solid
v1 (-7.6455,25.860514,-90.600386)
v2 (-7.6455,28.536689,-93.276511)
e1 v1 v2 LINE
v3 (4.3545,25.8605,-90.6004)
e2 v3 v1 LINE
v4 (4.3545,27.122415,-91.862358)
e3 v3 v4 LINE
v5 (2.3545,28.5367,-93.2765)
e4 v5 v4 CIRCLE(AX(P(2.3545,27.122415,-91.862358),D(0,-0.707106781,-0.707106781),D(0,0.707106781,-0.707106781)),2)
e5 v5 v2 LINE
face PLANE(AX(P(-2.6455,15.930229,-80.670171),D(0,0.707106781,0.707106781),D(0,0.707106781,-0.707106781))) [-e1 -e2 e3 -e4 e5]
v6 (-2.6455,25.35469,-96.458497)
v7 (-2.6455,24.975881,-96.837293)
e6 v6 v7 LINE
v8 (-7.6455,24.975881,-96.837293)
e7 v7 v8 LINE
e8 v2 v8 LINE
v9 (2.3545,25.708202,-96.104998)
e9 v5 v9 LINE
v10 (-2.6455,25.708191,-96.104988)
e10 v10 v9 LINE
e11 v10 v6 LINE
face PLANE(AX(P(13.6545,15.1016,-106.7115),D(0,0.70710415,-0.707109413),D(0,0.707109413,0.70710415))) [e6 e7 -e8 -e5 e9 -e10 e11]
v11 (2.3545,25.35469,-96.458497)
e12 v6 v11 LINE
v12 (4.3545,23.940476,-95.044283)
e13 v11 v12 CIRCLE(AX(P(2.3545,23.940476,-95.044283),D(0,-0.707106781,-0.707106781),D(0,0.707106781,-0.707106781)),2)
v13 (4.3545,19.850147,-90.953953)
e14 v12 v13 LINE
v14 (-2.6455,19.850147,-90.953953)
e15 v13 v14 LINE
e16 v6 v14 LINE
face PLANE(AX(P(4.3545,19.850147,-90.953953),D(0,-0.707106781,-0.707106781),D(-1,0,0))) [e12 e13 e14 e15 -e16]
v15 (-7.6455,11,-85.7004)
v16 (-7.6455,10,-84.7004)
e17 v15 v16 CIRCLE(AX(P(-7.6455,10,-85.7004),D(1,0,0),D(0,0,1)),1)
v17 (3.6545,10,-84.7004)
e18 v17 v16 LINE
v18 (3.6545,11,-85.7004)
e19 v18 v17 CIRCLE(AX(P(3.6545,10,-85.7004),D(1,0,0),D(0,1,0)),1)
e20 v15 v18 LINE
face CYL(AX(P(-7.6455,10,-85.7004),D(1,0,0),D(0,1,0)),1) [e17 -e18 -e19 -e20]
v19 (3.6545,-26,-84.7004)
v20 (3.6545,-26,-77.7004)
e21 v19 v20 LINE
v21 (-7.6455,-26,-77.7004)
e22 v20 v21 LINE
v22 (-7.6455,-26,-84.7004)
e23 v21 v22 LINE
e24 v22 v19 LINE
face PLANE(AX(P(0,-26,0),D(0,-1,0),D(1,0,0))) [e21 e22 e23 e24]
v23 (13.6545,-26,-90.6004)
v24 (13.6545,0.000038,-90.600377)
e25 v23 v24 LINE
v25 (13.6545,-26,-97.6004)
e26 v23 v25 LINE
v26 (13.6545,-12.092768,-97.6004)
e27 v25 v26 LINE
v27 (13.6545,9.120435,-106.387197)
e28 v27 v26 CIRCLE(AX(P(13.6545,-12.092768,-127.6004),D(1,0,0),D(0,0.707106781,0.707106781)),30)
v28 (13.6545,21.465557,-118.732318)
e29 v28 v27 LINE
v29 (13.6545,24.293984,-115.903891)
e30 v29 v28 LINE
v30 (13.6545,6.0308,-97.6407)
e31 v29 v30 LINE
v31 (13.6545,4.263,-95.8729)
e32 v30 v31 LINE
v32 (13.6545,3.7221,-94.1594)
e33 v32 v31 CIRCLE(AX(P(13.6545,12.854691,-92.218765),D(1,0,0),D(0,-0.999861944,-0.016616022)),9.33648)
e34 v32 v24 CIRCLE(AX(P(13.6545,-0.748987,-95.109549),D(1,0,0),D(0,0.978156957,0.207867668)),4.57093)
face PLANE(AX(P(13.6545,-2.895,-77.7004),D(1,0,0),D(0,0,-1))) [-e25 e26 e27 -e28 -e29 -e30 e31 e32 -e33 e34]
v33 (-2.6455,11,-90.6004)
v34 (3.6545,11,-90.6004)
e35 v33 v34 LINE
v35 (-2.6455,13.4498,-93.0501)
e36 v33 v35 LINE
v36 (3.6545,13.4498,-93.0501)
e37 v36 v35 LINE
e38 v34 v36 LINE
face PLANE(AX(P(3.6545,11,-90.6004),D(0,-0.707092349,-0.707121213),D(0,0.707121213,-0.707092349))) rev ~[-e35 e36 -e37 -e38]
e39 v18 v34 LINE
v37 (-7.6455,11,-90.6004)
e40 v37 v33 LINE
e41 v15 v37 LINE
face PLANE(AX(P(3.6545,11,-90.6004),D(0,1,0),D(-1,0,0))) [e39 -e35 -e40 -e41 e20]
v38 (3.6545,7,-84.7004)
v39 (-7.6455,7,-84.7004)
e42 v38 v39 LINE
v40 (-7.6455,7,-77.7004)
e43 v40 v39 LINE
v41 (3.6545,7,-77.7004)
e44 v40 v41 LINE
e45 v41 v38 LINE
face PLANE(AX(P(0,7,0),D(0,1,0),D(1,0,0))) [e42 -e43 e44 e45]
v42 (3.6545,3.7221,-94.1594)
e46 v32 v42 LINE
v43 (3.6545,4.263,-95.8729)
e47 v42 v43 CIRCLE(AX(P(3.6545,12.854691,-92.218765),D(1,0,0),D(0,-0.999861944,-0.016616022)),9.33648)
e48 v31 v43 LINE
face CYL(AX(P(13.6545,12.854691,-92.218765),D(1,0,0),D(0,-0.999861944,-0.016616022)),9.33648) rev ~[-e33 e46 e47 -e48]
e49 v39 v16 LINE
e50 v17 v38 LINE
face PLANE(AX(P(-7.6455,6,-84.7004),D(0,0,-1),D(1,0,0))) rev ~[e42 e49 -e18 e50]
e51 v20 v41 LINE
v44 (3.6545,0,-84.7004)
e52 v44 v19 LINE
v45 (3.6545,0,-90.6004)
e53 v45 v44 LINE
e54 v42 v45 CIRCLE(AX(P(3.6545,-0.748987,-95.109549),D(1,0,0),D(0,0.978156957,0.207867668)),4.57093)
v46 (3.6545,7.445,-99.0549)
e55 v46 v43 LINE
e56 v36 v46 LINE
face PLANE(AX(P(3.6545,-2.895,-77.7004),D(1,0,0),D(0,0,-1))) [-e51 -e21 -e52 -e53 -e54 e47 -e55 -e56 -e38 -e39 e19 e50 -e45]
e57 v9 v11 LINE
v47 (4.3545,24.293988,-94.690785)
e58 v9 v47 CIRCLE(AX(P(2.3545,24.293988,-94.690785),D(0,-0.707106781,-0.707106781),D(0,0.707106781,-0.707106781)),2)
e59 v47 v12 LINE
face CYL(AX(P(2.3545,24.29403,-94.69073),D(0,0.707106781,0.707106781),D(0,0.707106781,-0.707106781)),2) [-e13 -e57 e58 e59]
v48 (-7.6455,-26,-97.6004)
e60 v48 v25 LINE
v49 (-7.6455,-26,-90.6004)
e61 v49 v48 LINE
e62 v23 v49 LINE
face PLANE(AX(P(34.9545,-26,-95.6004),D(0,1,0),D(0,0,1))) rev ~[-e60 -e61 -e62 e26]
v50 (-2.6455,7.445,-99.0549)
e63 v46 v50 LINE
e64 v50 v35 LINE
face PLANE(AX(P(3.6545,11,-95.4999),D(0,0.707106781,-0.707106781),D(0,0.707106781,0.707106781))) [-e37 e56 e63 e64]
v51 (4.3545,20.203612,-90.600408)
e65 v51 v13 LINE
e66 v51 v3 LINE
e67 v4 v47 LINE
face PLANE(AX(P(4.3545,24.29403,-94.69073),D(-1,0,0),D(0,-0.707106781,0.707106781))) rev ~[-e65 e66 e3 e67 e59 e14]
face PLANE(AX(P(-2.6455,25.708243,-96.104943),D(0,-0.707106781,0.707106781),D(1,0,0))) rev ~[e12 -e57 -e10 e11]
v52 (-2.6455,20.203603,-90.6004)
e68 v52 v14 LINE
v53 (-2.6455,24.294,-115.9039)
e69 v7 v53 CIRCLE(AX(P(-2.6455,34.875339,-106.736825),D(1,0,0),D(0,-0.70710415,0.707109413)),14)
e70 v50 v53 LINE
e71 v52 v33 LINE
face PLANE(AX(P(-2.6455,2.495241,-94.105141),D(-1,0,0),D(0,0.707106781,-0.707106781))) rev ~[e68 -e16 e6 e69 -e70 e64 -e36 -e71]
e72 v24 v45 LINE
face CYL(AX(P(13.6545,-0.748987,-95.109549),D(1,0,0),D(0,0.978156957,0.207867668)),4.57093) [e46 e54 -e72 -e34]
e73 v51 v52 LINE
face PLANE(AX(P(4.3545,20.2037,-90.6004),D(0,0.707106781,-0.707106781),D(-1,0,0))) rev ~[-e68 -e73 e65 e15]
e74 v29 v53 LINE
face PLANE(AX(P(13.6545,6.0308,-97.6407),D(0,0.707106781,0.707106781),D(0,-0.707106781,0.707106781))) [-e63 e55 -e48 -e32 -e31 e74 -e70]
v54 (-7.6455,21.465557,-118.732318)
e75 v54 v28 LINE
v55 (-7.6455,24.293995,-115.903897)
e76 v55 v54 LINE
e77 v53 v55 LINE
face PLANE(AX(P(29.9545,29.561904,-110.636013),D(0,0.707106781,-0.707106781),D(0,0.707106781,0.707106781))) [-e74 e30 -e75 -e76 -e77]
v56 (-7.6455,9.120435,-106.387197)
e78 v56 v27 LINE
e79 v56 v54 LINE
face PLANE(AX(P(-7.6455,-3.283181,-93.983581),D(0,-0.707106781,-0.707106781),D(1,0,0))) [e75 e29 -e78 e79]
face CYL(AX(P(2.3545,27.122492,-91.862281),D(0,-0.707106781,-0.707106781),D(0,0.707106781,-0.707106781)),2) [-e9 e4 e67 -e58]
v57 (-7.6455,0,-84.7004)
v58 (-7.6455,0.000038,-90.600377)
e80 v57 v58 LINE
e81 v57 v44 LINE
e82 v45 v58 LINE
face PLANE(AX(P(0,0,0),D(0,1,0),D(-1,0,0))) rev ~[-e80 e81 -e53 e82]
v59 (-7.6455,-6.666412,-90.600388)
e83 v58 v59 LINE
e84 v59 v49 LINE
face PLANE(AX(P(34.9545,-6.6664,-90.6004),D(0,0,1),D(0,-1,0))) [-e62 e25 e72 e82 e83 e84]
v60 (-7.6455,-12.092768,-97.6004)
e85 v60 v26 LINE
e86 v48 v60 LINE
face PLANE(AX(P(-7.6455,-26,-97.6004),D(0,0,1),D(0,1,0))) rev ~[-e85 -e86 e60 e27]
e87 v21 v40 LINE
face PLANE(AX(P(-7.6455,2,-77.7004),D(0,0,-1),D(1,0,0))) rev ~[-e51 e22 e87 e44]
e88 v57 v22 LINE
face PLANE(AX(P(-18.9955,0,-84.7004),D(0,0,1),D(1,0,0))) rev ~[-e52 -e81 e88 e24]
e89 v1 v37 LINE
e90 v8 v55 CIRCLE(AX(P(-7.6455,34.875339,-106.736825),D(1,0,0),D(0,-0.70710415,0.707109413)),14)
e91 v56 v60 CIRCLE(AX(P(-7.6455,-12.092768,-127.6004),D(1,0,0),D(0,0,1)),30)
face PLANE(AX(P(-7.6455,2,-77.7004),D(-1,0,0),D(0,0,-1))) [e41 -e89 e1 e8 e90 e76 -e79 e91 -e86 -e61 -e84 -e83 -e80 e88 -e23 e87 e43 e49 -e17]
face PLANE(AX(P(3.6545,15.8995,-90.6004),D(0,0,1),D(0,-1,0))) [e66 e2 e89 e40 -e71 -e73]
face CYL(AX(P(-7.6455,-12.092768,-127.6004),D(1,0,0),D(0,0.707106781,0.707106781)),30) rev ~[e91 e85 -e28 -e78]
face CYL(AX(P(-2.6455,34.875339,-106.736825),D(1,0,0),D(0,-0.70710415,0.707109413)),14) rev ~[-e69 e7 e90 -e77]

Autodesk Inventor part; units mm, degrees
ref_plane "YZ Plane" through (0, 0, 0) normal (1, 0, 0) x (0, 1, 0)
ref_plane "XZ Plane" through (0, 0, 0) normal (0, 1, 0) x (-1, 0, 0)
ref_plane "XY Plane" through (0, 0, 0) normal (0, 0, 1) x (1, 0, 0)
sketch "Sketch1" plane through (0, 0, 0) normal (0, 1, 0) x (-1, 0, 0)
  line L0 (23.4955, 9.8996) -> (-50.8045, 9.8996)
  line L1 (-50.8045, 9.8996) -> (-50.8045, -84.7004)
  line L2 (-50.8045, -84.7004) -> (23.4955, -84.7004)
  line L3 (23.4955, -84.7004) -> (23.4955, 9.8996)
  line L4 (29.4455, 15.7996) -> (-56.7545, 15.7996)
  line L5 (-56.7545, 15.7996) -> (-56.7545, -90.6004)
  line L6 (-56.7545, -90.6004) -> (29.4455, -90.6004)
  line L7 (29.4455, -90.6004) -> (29.4455, 15.7996)
  line L8 (29.4455, -37.4004) -> (-56.7545, -37.4004) construction
  line L9 (-13.6545, -90.6004) -> (-13.6545, 15.7996) construction
  dimension "d0" = 94.6
  dimension "d1" = 74.3
  dimension "d2" = 106.4
  dimension "d3" = 86.2
extrude "Extrusion1" add sketch "Sketch1" along normal blind 6
fillet "Fillet1" radius 4.5 4 edges at (-23.4955, 3, 9.8996) (50.8045, 3, 9.8996) (50.8045, 3, -84.7004) (-23.4955, 3, -84.7004)
fillet "Fillet2" radius 4.5 4 edges at (56.7545, 3, 15.7996) (-29.4455, 3, 15.7996) (56.7545, 3, -90.6004) (-29.4455, 3, -90.6004)
sketch "Sketch2" plane through (0, 0, 0) normal (0, -1, 0) x (1, 0, 0)
  line L0 (50.8045, -80.2004) -> (50.8045, 5.3996) projected
  arc A0 (46.3045, -84.7004) -> (50.8045, -80.2004) centre (46.3045, -80.2004) ccw projected
  line L1 (-18.9955, -84.7004) -> (46.3045, -84.7004) projected
  arc A1 (-23.4955, -80.2004) -> (-18.9955, -84.7004) centre (-18.9955, -80.2004) ccw projected
  line L2 (-23.4955, 5.3996) -> (-23.4955, -80.2004) projected
  arc A2 (-18.9955, 9.8996) -> (-23.4955, 5.3996) centre (-18.9955, 5.3996) ccw projected
  line L3 (46.3045, 9.8996) -> (-18.9955, 9.8996) projected
  arc A3 (50.8045, 5.3996) -> (46.3045, 9.8996) centre (46.3045, 5.3996) ccw projected
  line L4 (43.8045, -77.7004) -> (-16.4955, -77.7004)
  line L5 (-16.4955, -77.7004) -> (-16.4955, 2.8996)
  line L6 (-16.4955, 2.8996) -> (43.8045, 2.8996)
  line L7 (43.8045, 2.8996) -> (43.8045, -77.7004)
  line L8 (13.6545, -84.7004) -> (13.6545, 9.8996) construction
  line L9 (46.3045, 9.8996) -> (-18.9955, 9.8996) construction
  line L10 (50.8045, -80.2004) -> (50.8045, 5.3996) construction
  line L11 (50.8045, -37.4004) -> (-23.4955, -37.4004) construction
  line L12 (56.7545, 11.2996) -> (56.7545, -86.1004) construction
  point P0 (0, 0)
  dimension "d8" = 5.95
  dimension "d9" = 7
  dimension "d10" = 7
extrude "Extrusion2" add sketch "Sketch2" along normal blind 6
fillet "Fillet3" radius 4.5 4 edges at (43.8045, -3, -77.7004) (43.8045, -3, 2.8996) (-16.4955, -3, 2.8996) (-16.4955, -3, -77.7004)
sketch "Sketch3" plane through (0, 0, 0) normal (0, 1, 0) x (1, 0, 0)
  arc A0 (46.3045, -9.8996) -> (50.8045, -5.3996) centre (46.3045, -5.3996) ccw projected
  line L0 (50.8045, 80.2004) -> (50.8045, -5.3996) projected
  arc A1 (50.8045, 80.2004) -> (46.3045, 84.7004) centre (46.3045, 80.2004) ccw projected
  line L1 (-18.9955, 84.7004) -> (46.3045, 84.7004) projected
  arc A2 (-18.9955, 84.7004) -> (-23.4955, 80.2004) centre (-18.9955, 80.2004) ccw projected
  line L2 (-23.4955, -5.3996) -> (-23.4955, 80.2004) projected
  arc A3 (-23.4955, -5.3996) -> (-18.9955, -9.8996) centre (-18.9955, -5.3996) ccw projected
  line L3 (46.3045, -9.8996) -> (-18.9955, -9.8996) projected
  arc A4 (43.8045, 73.2004) -> (39.3045, 77.7004) centre (39.3045, 73.2004) ccw projected
  line L4 (43.8045, 1.6004) -> (43.8045, 73.2004) projected
  arc A5 (39.3045, -2.8996) -> (43.8045, 1.6004) centre (39.3045, 1.6004) ccw projected
  line L5 (-11.9955, -2.8996) -> (39.3045, -2.8996) projected
  arc A6 (-16.4955, 1.6004) -> (-11.9955, -2.8996) centre (-11.9955, 1.6004) ccw projected
  line L6 (-16.4955, 73.2004) -> (-16.4955, 1.6004) projected
  arc A7 (-11.9955, 77.7004) -> (-16.4955, 73.2004) centre (-11.9955, 73.2004) ccw projected
  line L7 (39.3045, 77.7004) -> (-11.9955, 77.7004) projected
  point P0 (0, 0)
extrude "Extrusion3" add sketch "Sketch3" along normal blind 2
ref_plane "Work Plane1" through (-23.4955, 6, -84.7004) normal (0, 0.7071068, -0.7071068) x (1, 0, 0)
sketch "Sketch5" plane through (-23.4955, 6, -84.7004) normal (0, 0.7071068, -0.7071068) x (1, 0, 0)
  line L0 (4.5, 0) -> (69.8, 0) projected
  line L1 (37.15, 0) -> (37.15, -42.3796) construction
  circle A0 centre (37.15, 1.34) radius 1.34 construction
  line L2 (37.15, 1.34) -> (37.15, -18.66) construction
  line L3 (38.49, 1.34) -> (38.49, -18.66)
  line L4 (35.81, -18.66) -> (35.81, 1.34)
  arc A1 (38.49, 1.34) -> (35.81, 1.34) centre (37.15, 1.34) ccw
  arc A2 (35.81, -18.66) -> (38.49, -18.66) centre (37.15, -18.66) ccw
  point P0 (23.4955, -55.6496)
  point P1 (37.15, -8.66)
  dimension "d20" = 2.68
  dimension "d19" = 90
  dimension "d21" = 20
  dimension "d22" = 2.68
extrude "Extrusion5" cut sketch "Sketch5" along normal mid plane 51.82
sketch "Sketch6" plane through (-23.4955, 6, -84.7004) normal (0, 0.7071068, -0.7071068) x (1, 0, 0)
  arc A0 (38.49, 1.34) -> (35.81, 1.34) centre (37.15, 1.34) ccw projected
  line L0 (38.49, 0) -> (38.49, 1.34) projected
  arc A1 (38.49, 1.34) -> (35.81, 1.34) centre (37.15, 1.34) ccw projected
  line L1 (35.81, 1.34) -> (35.81, 0) projected
  line L2 (4.5, 0) -> (35.81, 0) projected
  line L3 (4.5, 2.8284) -> (4.5, 0) projected
  line L4 (4.5, 2.8284) -> (69.8, 2.8284) projected
  line L5 (69.8, 0) -> (69.8, 2.8284) projected
  line L6 (38.49, 0) -> (69.8, 0) projected
  line L7 (75.75, 8.4146) -> (-1.45, 8.4146) projected
  line L8 (74.9473, 2.68) -> (-18.0058, 2.68) construction
  line L9 (0, -55.225) -> (0, 5.3033) construction
  line L10 (90.8097, 9.1284) -> (-67.1811, 9.1284) construction
  line L11 (37.15, 2.68) -> (37.15, 37.6448) construction
  line L12 (58.45, 9.1284) -> (15.85, 9.1284)
  line L13 (15.85, 9.1284) -> (15.85, 13.1284)
  line L14 (15.85, 13.1284) -> (58.45, 13.1284)
  line L15 (58.45, 13.1284) -> (58.45, 9.1284)
  point P0 (23.4955, -55.6496)
  dimension "d25" = 6.3
  dimension "d26" = 42.6
  dimension "d27" = 4
extrude "Extrusion6" add sketch "Sketch6" along normal blind 35 contours L12 L13 L14 L15
sketch "Sketch7" plane through (-23.4955, 30.7487, -109.4492) normal (0, 0.7071068, -0.7071068) x (-1, 0, 0)
  line L0 (-15.85, -13.1284) -> (-15.85, -9.1284) projected
  line L1 (-58.45, -9.1284) -> (-58.45, -13.1284) projected
  point P0 (-23.4955, 55.6496)
  point P1 (-15.85, -11.1284)
  point P2 (-58.45, -11.1284)
  dimension "d30" = 42.6
sketch "Sketch8" plane through (34.9545, -3.2832, -93.9836) normal (1, 0, 0) x (0, 0.7071068, -0.7071068)
  line L0 (-0.0707, 4.7139) -> (-3.2527, 7.8958) projected
  line L1 (0.9899, 12.1385) -> (4.1719, 8.9565) projected
  line L2 (0, 0) -> (35, 0) projected
  line L3 (-0.0707, 4.7139) -> (-14.2134, -9.4288) construction
  line L4 (0, 4) -> (35, 4) projected
  line L5 (0, 4) -> (0, 0) projected
  line L6 (4.1719, 8.9565) -> (-4.7846, 0)
  line L7 (-4.7846, 0) -> (0, 0)
  line L8 (0, 0) -> (0, 4) projected
  line L9 (0, 0) -> (0, 4)
  line L10 (4.1719, 8.9565) -> (4.1719, 4)
  line L11 (0, 4) -> (35, 4) projected
  line L12 (4.1719, 4) -> (0, 4)
  line L13 (-0.0707, 4.7139) -> (4.1719, 8.9565) projected
  point P0 (-64.1349, 68.778)
  point P1 (4.1719, 4)
extrude "Extrusion7" add sketch "Sketch8" against normal blind 42.6
sketch "Sketch9" plane through (34.9545, -6.6664, -90.6004) normal (1, 0, 0) x (0, 0, -1)
  line L0 (0, 6.6664) -> (0, 0) projected
  line L1 (0, 0) -> (28.1319, 28.1319) projected
  line L2 (0, 0) -> (0, 6.6664) projected
  line L3 (0, 0) -> (0, -20)
  line L4 (0, -20) -> (5, -20)
  line L5 (5, -20) -> (5, 5)
  line L6 (0, 0) -> (28.1319, 28.1319) projected
  line L7 (5, 5) -> (0, 0)
  point P0 (-90.6004, 6.6664)
  point P1 (5, 5)
  dimension "d33" = 5
  dimension "d34" = 20
extrude "Extrusion8" add sketch "Sketch9" against normal blind 42.6
sketch "Sketch10" plane through (-7.6455, 24.294, -115.9039) normal (0, 0.7071068, 0.7071068) x (1, 0, 0)
  line L0 (0, -30.8281) -> (42.6, -30.8281) projected
  line L1 (42.6, -30.8281) -> (42.6, 0) projected
  line L2 (0, 0) -> (42.6, 0) projected
  line L3 (0, -30.8281) -> (0, 0) projected
  line L4 (42.6, -30.8281) -> (0, -30.8281) projected
  line L5 (0, -30.8281) -> (5, -30.8281)
  line L6 (5, -30.8281) -> (5, 0)
  line L7 (5, 0) -> (0, 0)
  line L8 (0, 0) -> (0, -30.8281)
  line L9 (42.6, 0) -> (0, 0) projected
  line L10 (37.6, 0) -> (42.6, 0)
  line L11 (42.6, 0) -> (42.6, -30.8281)
  line L12 (42.6, -30.8281) -> (37.6, -30.8281)
  line L13 (37.6, -30.8281) -> (37.6, 0)
  point P0 (7.6455, -99.1349)
  point P1 (37.6, 0)
  point P2 (37.6, -30.8281)
  dimension "d37" = 5
  dimension "d38" = 5
extrude "Extrusion9" add sketch "Sketch10" along normal blind 19 contours L3 L2 L6 L0 | L13 L2 L1 L0
sketch "Sketch11" plane through (-7.6455, 37.729, -102.4689) normal (0, 0.7071068, 0.7071068) x (1, 0, 0)
  line L0 (0, -30.8281) -> (5, -30.8281) projected
  line L1 (5, 0) -> (0, 0) projected
  point P0 (7.6455, -99.1349)
  point P1 (2.5, 0)
  point P2 (2.5, -30.8281)
  dimension "d41" = 30.8281
sketch "Sketch12" plane through (-2.6455, 2.4952, -94.1052) normal (1, 0, 0) x (0, -0.7071068, -0.7071068)
  line L0 (0, 30.8281) -> (0, 0) projected
  line L1 (0, 30.8281) -> (-19, 30.8281) projected
  line L2 (-19, 0) -> (-19, 30.8281) projected
  line L3 (-4.9565, 0) -> (-19, 0) projected
  line L4 (0, 0) -> (-4.9565, 0) projected
  line L5 (-19, 30.8281) -> (-15, 30.8281)
  line L6 (-15, 30.8281) -> (-15, 0)
  line L7 (-15, 0) -> (-19, 0)
  line L8 (-19, 0) -> (-19, 30.8281)
  point P0 (-64.778, -68.3068)
  dimension "d42" = 15
extrude "Extrusion10" add sketch "Sketch12" along normal blind 8.5 contours L6 L3 L2 L1
sketch "Sketch13" plane through (29.9545, 2.4952, -94.1052) normal (-1, 0, 0) x (0, 0.7071068, 0.7071068)
  line L0 (0, 0) -> (0, 30.8281) projected
  line L1 (4.9565, 0) -> (0, 0) projected
  line L2 (4.9565, 0) -> (19, 0) projected
  line L3 (19, 30.8281) -> (19, 0) projected
  line L4 (0, 30.8281) -> (19, 30.8281) projected
  line L5 (19, 30.8281) -> (7.45, 30.8281)
  line L6 (7.45, 30.8281) -> (7.45, 0)
  line L7 (7.45, 0) -> (19, 0)
  line L8 (19, 0) -> (19, 30.8281)
  point P0 (64.778, -68.3068)
  point P1 (7.45, 30.8281)
  dimension "d45" = 7.45
extrude "Extrusion11" add sketch "Sketch13" along normal blind 8.5 contours L4 L3 L2 L6
sketch "Sketch14" plane through (34.9545, -26.6664, -90.6004) normal (1, 0, 0) x (0, 0, -1)
  line L0 (5, 25) -> (28.1319, 48.1319) projected
  line L1 (28.1319, 48.1319) -> (11.8685, 64.3954) projected
  line L2 (-9.9303, 42.5967) -> (11.8685, 64.3954) projected
  line L3 (0, 32.6664) -> (-9.9303, 42.5967) projected
  line L4 (0, 26.6664) -> (0, 32.6664) projected
  line L5 (0, 26.6664) -> (0, 0) projected
  line L6 (0, 0) -> (5, 0) projected
  line L7 (5, 0) -> (5, 25) projected
  line L8 (0, 32.6664) -> (3.5048, 29.1616) construction
  line L9 (-9.9303, 42.5967) -> (11.8685, 64.3954) construction
  line L10 (-7.1018, 39.7682) -> (14.6969, 61.567) construction
  line L11 (0, 32.6664) -> (-1.7632, 34.4296) projected
  line L12 (0, 52.5269) -> (0, 32.6664)
  line L13 (-1.7632, 34.4296) -> (-9.9303, 42.5967) projected
  line L14 (0, 32.6664) -> (-9.9303, 42.5967)
  line L15 (-9.9303, 42.5967) -> (0, 52.5269)
  point P0 (-90.6004, 26.6664)
  point P1 (11.8685, 64.3954)
  point P2 (0, 52.5269)
extrude "Extrusion12" cut sketch "Sketch14" against normal blind 100 contours L12 L3 L2
sketch "Sketch15" plane through (-23.4955, 30.7487, -109.4492) normal (0, 0.7071068, -0.7071068) x (-1, 0, 0)
  line L0 (-58.45, -13.1284) -> (-15.85, -13.1284) projected
  line L1 (-15.85, -13.1284) -> (-15.85, 9.8716) projected
  line L2 (-15.85, 9.8716) -> (-29.35, 9.8716) projected
  line L3 (-29.35, 5.8716) -> (-29.35, 9.8716) projected
  line L4 (-20.85, 5.8716) -> (-29.35, 5.8716) projected
  line L5 (-20.85, -9.1284) -> (-20.85, 5.8716) projected
  line L6 (-20.85, -9.1284) -> (-53.45, -9.1284) projected
  line L7 (-53.45, -9.1284) -> (-53.45, -1.6784) projected
  line L8 (-53.45, -1.6784) -> (-44.95, -1.6784) projected
  line L9 (-44.95, 9.8716) -> (-44.95, -1.6784) projected
  line L10 (-58.45, 9.8716) -> (-44.95, 9.8716) projected
  line L11 (-58.45, -13.1284) -> (-58.45, 9.8716) projected
  line L12 (-58.45, 9.8716) -> (-44.95, 9.8716)
  line L13 (-44.95, 9.8716) -> (-44.95, 2.3216)
  line L14 (-44.95, 2.3216) -> (-58.45, 2.3216)
  line L15 (-58.45, 2.3216) -> (-58.45, 9.8716)
  point P0 (-23.4955, 55.6496)
  point P1 (-51.7, 2.3216)
  point P2 (-58.45, 2.3216)
  dimension "d52" = 4
extrude "Extrusion13" cut sketch "Sketch15" against normal blind 100 contours L11 L10 L9 L14
sketch "Sketch16" plane through (-2.6455, 24.294, -115.9039) normal (0, 0.7071068, 0.7071068) x (1, 0, 0)
  line L0 (32.6, -30.8281) -> (0, -30.8281) projected
  line L1 (8.5, -20.7846) -> (0, -20.7846) projected
  point P0 (2.6455, -99.1349)
  dimension "d55" = 10.0435
sketch "Sketch17" plane through (-2.6455, 6, -90.6004) normal (1, 0, 0) x (0, 0, -1)
  line L0 (0, 14.2037) -> (0, 0) projected
  line L1 (3.5048, -3.5048) -> (0, 0) projected
  line L2 (25.3035, 18.294) -> (3.5048, -3.5048) projected
  line L3 (25.3035, 18.294) -> (14.6969, 28.9006) projected
  line L4 (14.6969, 28.9006) -> (0, 14.2037) projected
  line L5 (5.6261, -1.3835) -> (3.5048, -3.5048)
  line L6 (3.5048, -3.5048) -> (0, 0)
  line L7 (0, 0) -> (2.1213, 2.1213)
  line L8 (2.1213, 2.1213) -> (5.6261, -1.3835)
  point P0 (-90.6004, -6)
  dimension "d56" = 3
extrude "Extrusion14" add sketch "Sketch17" along normal blind 34.75 contours L7 L8 L2 L1
sketch "Sketch18" plane through (0, -6, 0) normal (0, -1, 0) x (1, 0, 0)
  line L0 (-18.9955, -84.7004) -> (46.3045, -84.7004) projected
  line L1 (39.3045, -77.7004) -> (-11.9955, -77.7004) projected
  line L2 (-7.6455, -95.6004) -> (-7.6455, -90.6004) projected
  line L3 (34.9545, -90.6004) -> (34.9545, -95.6004) projected
  line L4 (-18.9955, -84.7004) -> (46.3045, -84.7004) projected
  line L5 (-7.6455, -84.7004) -> (34.9545, -84.7004)
  line L6 (34.9545, -84.7004) -> (34.9545, -77.7004)
  line L7 (34.9545, -77.7004) -> (-7.6455, -77.7004)
  line L8 (-7.6455, -77.7004) -> (-7.6455, -84.7004)
  point P0 (0, 0)
extrude "Extrusion15" add sketch "Sketch18" along normal blind 20
fillet "Fillet5" radius 5 2 edges at (5.8545, 36.3148, -103.8831) (21.4545, 30.9761, -109.2218)
sketch "Sketch19" plane through (0, -6, 0) normal (0, -1, 0) x (1, 0, 0)
  line L0 (34.9545, -118.7324) -> (-7.6455, -118.7324) projected
  line L1 (34.9545, -95.6004) -> (34.9545, -118.7324) projected
  line L2 (34.9545, -77.7004) -> (-7.6455, -77.7004) projected
  line L3 (34.9545, -84.7004) -> (34.9545, -77.7004) projected
  line L4 (-7.6455, -77.7004) -> (-7.6455, -84.7004) projected
  line L5 (-7.6455, -95.6004) -> (-7.6455, -118.7324) projected
  line L6 (34.9545, -118.7324) -> (-7.6455, -118.7324)
  line L7 (-7.6455, -118.7324) -> (-7.6455, -77.7004)
  line L8 (-7.6455, -77.7004) -> (34.9545, -77.7004)
  line L9 (34.9545, -77.7004) -> (34.9545, -118.7324)
  point P0 (0, 0)
  point P1 (34.9545, -84.7004)
  point P2 (-7.6455, -84.7004)
extrude "Extrusion16" cut sketch "Sketch19" along normal mid plane 100 keep common part
sketch "Sketch20" plane through (34.9545, 2, -77.7004) normal (1, 0, 0) x (0, 0, -1)
  line L0 (7, -28) -> (0, -28) projected
  line L1 (7, -2) -> (7, -28) construction
  line L2 (7, -28) -> (31.0161, -28) construction
  line L3 (17.9, -28.6664) -> (12.9, -28.6664) projected
  line L4 (12.9, -28.6664) -> (17.9, -28.6664)
  line L5 (17.9, -28.6664) -> (17.9, -28)
  line L6 (17.9, -28) -> (12.9, -28)
  line L7 (12.9, -28) -> (12.9, -28.6664)
  point P0 (-77.7004, -2)
  point P1 (17.9, -28.6664)
extrude "Extrusion17" cut sketch "Sketch20" against normal blind 100
sketch "Sketch21" plane through (0, 6, 0) normal (0, 1, 0) x (1, 0, 0)
  line L0 (-7.6455, 84.7004) -> (-7.6455, 90.6004) projected
  line L1 (-7.6455, 84.7004) -> (12.3145, 84.7004) projected
  line L2 (12.3145, 84.7004) -> (12.3145, 86.5955) projected
  ellipse E0 centre (13.6545, 86.5955) end of major axis (13.6545, 88.4905) minor radius 1.34 (14.9945, 86.5955) -> (12.3145, 86.5955) ccw projected
  line L3 (14.9945, 86.5955) -> (14.9945, 84.7004) projected
  line L4 (14.9945, 84.7004) -> (34.9545, 84.7004) projected
  line L5 (34.9545, 90.6004) -> (34.9545, 84.7004) projected
  line L6 (34.9545, 90.6004) -> (29.9545, 90.6004) projected
  line L7 (29.9545, 90.6004) -> (-2.6455, 90.6004) projected
  line L8 (-2.6455, 90.6004) -> (-7.6455, 90.6004) projected
  point P0 (0, 0)
extrude "Extrusion18" add sketch "Sketch21" along normal blind 5
sketch "Sketch22" plane through (0, 2, 0) normal (0, 1, 0) x (1, 0, 0)
  line L0 (-7.6455, 77.7004) -> (-7.6455, 84.7004) projected
  line L1 (-7.6455, 77.7004) -> (12.3145, 77.7004) projected
  line L2 (12.3145, 77.7004) -> (12.3145, 82.5955) projected
  ellipse E0 centre (13.6545, 82.5955) end of major axis (13.6545, 84.4905) minor radius 1.34 (14.9945, 82.5955) -> (12.3145, 82.5955) ccw projected
  line L3 (14.9945, 82.5955) -> (14.9945, 77.7004) projected
  line L4 (14.9945, 77.7004) -> (34.9545, 77.7004) projected
  line L5 (34.9545, 84.7004) -> (34.9545, 77.7004) projected
  line L6 (-7.6455, 84.7004) -> (34.9545, 84.7004) projected
  point P0 (0, 0)
extrude "Extrusion19" add sketch "Sketch22" along normal blind 5
sketch "Sketch23" plane through (-23.4955, 6, -84.7004) normal (0, 0.7071068, -0.7071068) x (1, 0, 0)
  arc A0 (38.49, 1.34) -> (35.81, 1.34) centre (37.15, 1.34) ccw projected
  line L0 (37.15, 1.34) -> (37.15, -18.66) construction
  line L1 (35.81, 1.34) -> (35.81, -18.66)
  line L2 (38.49, -18.66) -> (38.49, 1.34)
  arc A1 (38.49, 1.34) -> (35.81, 1.34) centre (37.15, 1.34) ccw
  arc A2 (35.81, -18.66) -> (38.49, -18.66) centre (37.15, -18.66) ccw
  point P0 (23.4955, -55.6496)
  point P1 (37.15, -8.66)
  dimension "d70" = 20
extrude "Extrusion20" cut sketch "Sketch23" along normal mid plane 100
sketch "Sketch24" plane through (-2.6455, 11, -90.6004) normal (1, 0, 0) x (0, 0, -1)
  line L0 (2.1213, -2.8787) -> (5.6261, -6.3835) projected
  line L1 (25.3035, 13.294) -> (5.6261, -6.3835) projected
  line L2 (25.3035, 13.294) -> (14.6969, 23.9006) projected
  line L3 (14.6969, 23.9006) -> (0, 9.2037) projected
  line L4 (0, 9.2037) -> (0, 0) projected
  line L5 (0, 0) -> (0, -5) projected
  line L6 (0, -5) -> (2.1213, -2.8787) projected
  line L7 (0, -0.7574) -> (2.1213, -2.8787)
  line L8 (0, -0.7574) -> (0, -5)
  line L9 (0, -11) -> (-5.9, -11) projected
  line L10 (0, -5) -> (2.1213, -2.8787)
  point P0 (-90.6004, -11)
extrude "Extrusion21" add sketch "Sketch24" along normal blind 33.25 contours L6 L5 L7
sketch "Sketch25" plane through (-23.4955, 6, -84.7004) normal (0, 0.7071068, -0.7071068) x (1, 0, 0)
  line L0 (35.81, 1.34) -> (35.81, -5.6569) projected
  line L1 (38.49, -5.6569) -> (38.49, 1.34) projected
  arc A0 (38.49, 1.34) -> (35.81, 1.34) centre (37.15, 1.34) ccw projected
  line L2 (37.15, 1.34) -> (37.15, -8.66) construction
  line L3 (35.81, 1.34) -> (35.81, -8.66)
  line L4 (38.49, -8.66) -> (38.49, 1.34)
  arc A1 (38.49, 1.34) -> (35.81, 1.34) centre (37.15, 1.34) ccw
  arc A2 (35.81, -8.66) -> (38.49, -8.66) centre (37.15, -8.66) ccw
  point P0 (23.4955, -55.6496)
  point P1 (37.15, -3.66)
  dimension "d75" = 10
extrude "Extrusion22" cut sketch "Sketch25" along normal mid plane 33.25
fillet "Fillet6" radius 1 2 edges at (2.3345, 11, -84.7004) (24.9745, 11, -84.7004)
fillet "Fillet7" radius 1 8 edges at (12.3145, 10.7071, -84.9933) (12.3145, 8.5, -84.7004) (12.3145, 11, -88.1504) (14.9945, 10.7071, -84.9933) (14.9945, 8.5, -84.7004) (14.9945, 11, -88.1504) (14.9945, 7, -81.2004) (12.3145, 7, -81.2004)
sketch "Sketch26" plane through (-7.6455, 0, -90.6004) normal (-1, 0, 0) x (0, 0, 1)
  line L0 (5.9, 0) -> (5.9, -26) projected
  line L1 (12.9, -26) -> (12.9, 7) projected
  line L2 (-5, -1.6664) -> (-5, -26) projected
  line L3 (0, -26) -> (0, 0) projected
  line L4 (-5, -26) -> (0, -26) projected
  line L5 (-5, -1.6664) -> (-28.1319, 21.4655) projected
  line L6 (-5, -26) -> (-5, -1.6664) projected
  line L7 (-5, -26) -> (-7, -26)
  line L8 (-7, -26) -> (-7, 0.3336)
  line L9 (-5, -1.6664) -> (-28.1319, 21.4655) projected
  line L10 (-7, 0.3336) -> (-5, -1.6664)
  line L11 (-5, -1.6664) -> (-5, -26)
  point P0 (90.6004, 0)
  point P1 (-7, 0.3336)
  dimension "d80" = 7
  dimension "d81" = 5
  dimension "d82" = 2
sketch "Sketch27" plane through (0, -26, 0) normal (0, -1, 0) x (1, 0, 0)
  line L0 (-7.6455, -77.7004) -> (-7.6455, -84.7004) projected
  line L1 (34.9545, -84.7004) -> (34.9545, -77.7004) projected
  point P0 (0, 0)
  point P1 (-7.6455, -81.2004)
  point P2 (34.9545, -81.2004)
  dimension "d83" = 42.6
extrude "Extrusion23" add sketch "Sketch26" against normal blind 42.6
fillet "Fillet8" radius 30 1 edges at (13.6545, 0.3336, -97.6004)
ref_plane "Work Plane2" through (13.6545, -2.895, -77.7004) normal (1, 0, 0) x (0, 0, -1)
sketch "Sketch28" plane through (13.6545, -2.895, -77.7004) normal (1, 0, 0) x (0, 0, -1)
  line L0 (45.7087, -33.5387) -> (-16.3366, -33.5387)
  line L1 (-16.3366, -33.5387) -> (-16.3366, 45.9991)
  line L2 (-16.3366, 45.9991) -> (45.7087, 45.9991)
  line L3 (45.7087, 45.9991) -> (45.7087, -33.5387)
  point P0 (-77.7004, 2.895)
extrude "Extrusion24" cut sketch "Sketch28" along normal blind 100
sketch "Sketch29" plane through (13.6545, -2.895, -77.7004) normal (1, 0, 0) x (0, 0, -1)
  line L0 (13.0897, 12.948) -> (12.9, 13.1377) projected
  line L1 (12.895, 13.895) -> (12.895, 12.895) projected
  line L2 (13.0897, 12.948) -> (13.9664, 12.0713) projected
  line L3 (13.9664, 12.0713) -> (18.5261, 7.5116) projected
  line L4 (18.5261, 7.5116) -> (38.2035, 27.189) projected
  line L5 (12.9, 23.0987) -> (12.9, 13.895) projected
  line L6 (12.9, 13.1377) -> (18.5261, 7.5116) projected
  line L7 (12.9, 15.9661) -> (12.9, 13.1377)
  line L8 (12.9, 13.1377) -> (18.5261, 7.5116)
  line L9 (18.5261, 7.5116) -> (19.9403, 8.9258)
  line L10 (38.2035, 27.189) -> (18.5261, 7.5116) projected
  line L11 (19.9403, 8.9258) -> (12.9, 15.9661)
  point P0 (-77.7004, 2.895)
  point P1 (19.9403, 8.9258)
  dimension "d92" = 2
extrude "Extrusion25" add sketch "Sketch29" against normal blind 18
sketch "Sketch30" plane through (13.6545, -2.895, -77.7004) normal (1, 0, 0) x (0, 0, -1)
  line L0 (0, -1.895) -> (13.9664, 12.0713) projected
  line L1 (0, -1.895) -> (0, 0) projected
  line L2 (0, -1.895) -> (15.3806, 13.4855)
  line L3 (12.9, 15.9661) -> (12.9, 13.1377) projected
  line L4 (15.3806, 13.4855) -> (12.9, 15.9661)
  line L5 (12.9, 15.9661) -> (0, 15.9661)
  line L6 (0, -23.105) -> (0, -1.895) projected
  line L7 (0, 15.9661) -> (0, -1.895)
  point P0 (-77.7004, 2.895)
extrude "Extrusion26" cut sketch "Sketch30" against normal blind 10
sketch "Sketch31" plane through (-7.6455, 25.8605, -90.6004) normal (0, 0, 1) x (1, 0, 0)
  line L0 (11.3, -14.8605) -> (11.3, -12.7894) projected
  line L1 (11.3, -12.7894) -> (5, -12.7894) projected
  line L2 (5, -5.6569) -> (5, -12.7894) projected
  line L3 (13.5, -5.6569) -> (5, -5.6569) projected
  line L4 (13.5, 0) -> (13.5, -5.6569) projected
  line L5 (0, 0) -> (13.5, 0) projected
  line L6 (0, -14.8605) -> (0, 0) projected
  line L7 (11.3, -14.8605) -> (0, -14.8605) projected
  line L8 (11.3, -12.7894) -> (5, -12.7894)
  line L9 (5, -12.7894) -> (5, -14.8605)
  line L10 (5, -14.8605) -> (11.3, -14.8605)
  line L11 (11.3, -14.8605) -> (11.3, -12.7894)
  point P0 (7.6455, -25.8605)
  point P1 (5, -12.7894)
extrude "Extrusion27" cut sketch "Sketch31" against normal blind 7 contours L7 L9 L1 L0
sketch "Sketch32" plane through (13.6545, 6.0308, -97.6407) normal (0, 0.7071068, -0.7071068) x (-1, 0, 0)
  line L0 (16.3, 0) -> (16.3, 15) projected
  line L1 (16.3, 0) -> (0, 0) projected
  line L2 (16.3, 0) -> (9.7, 0)
  line L3 (9.7, 0) -> (9.7, 5.4204)
  line L4 (9.7, 5.4204) -> (16.3, 5.4204)
  line L5 (16.3, 5.4204) -> (16.3, 0)
  line L6 (0, -84.75) -> (0, 147.5281) projected
  point P0 (13.6545, 64.778)
  point P1 (9.7, 2.7102)
  dimension "d100" = 6.6
  dimension "d101" = 9.7
sketch "Sketch33" plane through (13.6545, -2.895, -77.7004) normal (1, 0, 0) x (0, 0, -1)
  line L0 (0, -1.895) -> (15.3806, 13.4855) projected
  line L1 (79.8676, -51.0015) -> (-84.3778, 113.2439) projected
  line L2 (19.9403, 8.9258) -> (38.2035, 27.189) projected
  line L3 (15.3806, 13.4855) -> (19.9403, 8.9258)
  line L4 (19.9403, 8.9258) -> (18.1725, 7.158)
  line L5 (18.1725, 7.158) -> (13.6128, 11.7178)
  line L6 (13.6128, 11.7178) -> (15.3806, 13.4855)
  point P0 (-77.7004, 2.895)
  point P1 (13.6128, 11.7178)
  dimension "d102" = 2.5
extrude "Extrusion28" cut sketch "Sketch33" against normal blind 10
sketch "Sketch34" plane through (13.6545, -2.895, -77.7004) normal (1, 0, 0) x (0, 0, -1)
  line L0 (18.1725, 7.158) -> (13.6128, 11.7178) projected
  line L1 (0, -1.895) -> (13.6128, 11.7178) projected
  line L2 (18.1725, 7.158) -> (13.6128, 11.7178) projected
  line L3 (18.1725, 7.158) -> (38.2035, 27.189) projected
  line L4 (16.7948, 8.5358) -> (14.6735, 6.4145)
  line L5 (13.6128, 11.7178) -> (0, -1.895) projected
  arc A0 (14.6735, 6.4145) -> (3.6254, 1.7304) centre (14.9391, -9.5833) ccw
  line L6 (3.6254, 1.7304) -> (13.6128, 11.7178)
  line L7 (13.6128, 11.7178) -> (16.7948, 8.5358)
  point P0 (-77.7004, 2.895)
  point P1 (3.6254, 1.7304)
  point P2 (16.7948, 8.5358)
  dimension "d105" = 4.5
  dimension "d106" = 3
  dimension "d107" = 16
extrude "Extrusion29" cut sketch "Sketch34" against normal blind 10
fillet "Fillet10" radius 10 1 edges at (8.6545, -4.7901, -77.7004)
sketch "Sketch35" plane through (3.6545, -2.895, -77.7004) normal (1, 0, 0) x (0, 0, -1)
  line L0 (14.9711, 13.895) -> (8, 13.895) projected
  arc A0 (8, 13.895) -> (7, 12.895) centre (8, 12.895) ccw projected
  line L1 (7, 9.895) -> (7, 12.895) projected
  line L2 (0, 9.895) -> (7, 9.895) projected
  line L3 (0, -6.0372) -> (0, 9.895) projected
  arc A1 (2.9289, 1.0339) -> (0, -6.0372) centre (10, -6.0372) ccw projected
  line L4 (3.6254, 1.7304) -> (2.9289, 1.0339) projected
  line L5 (14.9711, 13.895) -> (19.9403, 8.9258) projected
  arc A2 (14.6735, 6.4145) -> (3.6254, 1.7304) centre (14.9391, -9.5833) ccw projected
  line L6 (16.7948, 8.5358) -> (14.6735, 6.4145) projected
  line L7 (18.1725, 7.158) -> (16.7948, 8.5358) projected
  line L8 (19.9403, 8.9258) -> (18.1725, 7.158) projected
  point P0 (-77.7004, 2.895)
sketch "Sketch36" plane through (13.6545, -2.895, -77.7004) normal (1, 0, 0) x (0, 0, -1)
  line L0 (38.2035, 27.189) -> (27.5969, 37.7956) projected
  line L1 (41.0319, 24.3606) -> (28.6868, 12.0154) projected
  line L2 (21.2329, 37.0885) -> (12.9, 28.7556) projected
  line L3 (18.1725, 7.158) -> (38.2035, 27.189) projected
  line L4 (41.0319, 24.3606) -> (24.7685, 40.624) projected
  line L5 (24.7685, 40.624) -> (38.2035, 27.189)
  line L6 (38.2035, 27.189) -> (29.0111, 17.9966)
  line L7 (29.0111, 17.9966) -> (15.5761, 31.4317)
  line L8 (15.5761, 31.4317) -> (24.7685, 40.624)
  point P0 (-77.7004, 2.895)
  point P1 (31.486, 33.9065)
  dimension "d111" = 13
extrude "Extrusion30" cut sketch "Sketch36" against normal blind 100
sketch "Sketch37" plane through (-7.6455, 37.729, -102.4689) normal (0, 0.7071068, 0.7071068) x (1, 0, 0)
  line L0 (5, -20.7846) -> (5, -27.2925) projected
  line L1 (13.5, -13) -> (13.5, -16.7846) projected
  line L2 (13.5, -16.7846) -> (13.5, -20.7846) projected
  line L3 (13.5, -20.7846) -> (5, -20.7846) projected
  line L4 (5, -13) -> (13.5, -13) projected
  line L5 (13.5, -20.7846) -> (12, -20.7846)
  line L6 (12, -20.7846) -> (12, -13)
  line L7 (12, -13) -> (13.5, -13)
  line L8 (13.5, -13) -> (13.5, -20.7846)
  point P0 (7.6455, -99.1349)
  dimension "d114" = 7
extrude "Extrusion31" cut sketch "Sketch37" against normal blind 10
fillet "Fillet11" radius 2 1 edges at (4.3545, 27.1224, -94.6907)
fillet "Fillet12" radius 14 1 edges at (-5.1455, 15.1016, -106.7115)
sketch "Sketch38" plane through (3.6545, -2.895, -77.7004) normal (1, 0, 0) x (0, 0, -1)
  line L0 (14.9711, 13.895) -> (8, 13.895) projected
  line L1 (79.8676, -51.0015) -> (-84.3778, 113.2439) projected
  line L2 (18.1725, 7.158) -> (38.2035, 27.189) projected
  line L3 (14.9711, 13.895) -> (19.9403, 8.9258) projected
  line L4 (14.9711, 13.895) -> (17.7995, 13.895)
  line L5 (17.7995, 13.895) -> (21.3545, 10.34)
  line L6 (21.3545, 10.34) -> (19.9403, 8.9258)
  line L7 (19.9403, 8.9258) -> (18.1725, 7.158) projected
  line L8 (19.9403, 8.9258) -> (14.9711, 13.895)
  point P0 (-77.7004, 2.895)
  dimension "d119" = 2
extrude "Extrusion32" add sketch "Sketch38" against normal blind 10
sketch "Sketch39" plane through (3.6545, -2.895, -77.7004) normal (1, 0, 0) x (0, 0, -1)
  line L0 (17.7995, 13.895) -> (8, 13.895) projected
  arc A0 (8, 13.895) -> (7, 12.895) centre (8, 12.895) ccw projected
  line L1 (7, 9.895) -> (7, 12.895) projected
  line L2 (0, 9.895) -> (7, 9.895) projected
  line L3 (0, -6.0372) -> (0, 9.895) projected
  arc A1 (2.9289, 1.0339) -> (0, -6.0372) centre (10, -6.0372) ccw projected
  line L4 (3.6254, 1.7304) -> (2.9289, 1.0339) projected
  arc A2 (14.6735, 6.4145) -> (3.6254, 1.7304) centre (14.9391, -9.5833) ccw projected
  line L5 (16.7948, 8.5358) -> (14.6735, 6.4145) projected
  line L6 (18.1725, 7.158) -> (16.7948, 8.5358) projected
  line L7 (21.3545, 10.34) -> (18.1725, 7.158) projected
  line L8 (21.3545, 10.34) -> (17.7995, 13.895) projected
  line L9 (17.7995, 13.895) -> (21.3545, 10.34) projected
  line L10 (38.2035, 27.189) -> (21.3545, 10.34) projected
  arc A3 (19.1369, 27.8708) -> (38.2035, 27.189) centre (29.0364, 37.7703) ccw projected
  line L11 (19.1369, 27.8708) -> (18.4045, 28.6032) projected
  line L12 (18.4045, 28.6032) -> (12.9, 23.0987) projected
  line L13 (12.9, 23.0987) -> (12.9, 13.895) projected
  line L14 (12.9, 13.895) -> (17.7995, 13.895) projected
  line L15 (17.7995, 13.895) -> (12.9, 18.7945)
  line L16 (12.9, 18.7945) -> (12.9, 13.895)
  line L17 (12.9, 13.895) -> (17.7995, 13.895)
  point P0 (-77.7004, 2.895)
  point P1 (12.9, 13.895)
  dimension "d122" = 0
extrude "Extrusion33" add sketch "Sketch39" against normal blind 10 contours L0 L13 L15
sketch "Sketch40" plane through (13.6545, -2.895, -77.7004) normal (1, 0, 0) x (0, 0, -1)
  line L0 (16.7948, 8.5358) -> (14.6735, 6.4145) projected
  line L1 (18.1725, 7.158) -> (16.7948, 8.5358) projected
  line L2 (18.1725, 7.158) -> (38.2035, 27.189) projected
  line L3 (21.3545, 10.34) -> (18.1725, 7.158) projected
  arc A0 (14.6735, 6.4145) -> (18.1725, 7.158) centre (14.5185, 15.7485) ccw
  arc A1 (14.6735, 6.4145) -> (3.6254, 1.7304) centre (14.9391, -9.5833) ccw projected
  point P0 (-77.7004, 2.895)
extrude "Extrusion34" cut sketch "Sketch40" against normal blind 10
sketch "Sketch41" plane through (4.3545, 20.2037, -90.6004) normal (0, -0.7071068, -0.7071068) x (-1, 0, 0)
  arc A0 (2, 7.7846) -> (0, 5.7846) centre (2, 5.7846) ccw projected
  line L0 (0, 5.7846) -> (0, 0) projected
  line L1 (0, 0) -> (7, 0) projected
  line L2 (7, 7.7846) -> (7, 0) projected
  line L3 (7, 7.7846) -> (2, 7.7846) projected
  point P0 (4.3545, -78.3503)
extrude "Extrusion35" add sketch "Sketch41" along normal blind 0.5
sketch "Sketch42" plane through (3.6545, -2.895, -77.7004) normal (1, 0, 0) x (0, 0, -1)
  line L0 (12.9, 18.7945) -> (12.9, 13.895) projected
  line L1 (21.3545, 10.34) -> (12.9, 18.7945) projected
  line L2 (12.9, 13.895) -> (12.9, 28.7556) projected
  line L3 (12.9, 13.895) -> (15.3497, 16.3448)
  line L4 (12.9, 18.7945) -> (21.3545, 10.34) projected
  line L5 (15.3497, 16.3448) -> (12.9, 18.7945)
  line L6 (12.9, 13.895) -> (8, 13.895) projected
  line L7 (12.9, 18.7945) -> (12.9, 13.895)
  point P0 (-77.7004, 2.895)
extrude "Extrusion36" cut sketch "Sketch42" against normal blind 6.3
sketch "Sketch44" plane through (13.6545, -2.895, -77.7004) normal (1, 0, 0) x (0, 0, -1)
  arc A0 (14.6735, 6.4145) -> (18.1725, 7.158) centre (14.5185, 15.7485) ccw projected
  arc A1 (14.6735, 6.4145) -> (3.6254, 1.7304) centre (14.9391, -9.5833) ccw projected
  line L0 (2.9289, 1.0339) -> (3.6254, 1.7304) projected
  arc A2 (2.9289, 1.0339) -> (0, -6.0372) centre (10, -6.0372) ccw projected
  line L1 (0, -23.105) -> (0, -6.0372) projected
  line L2 (7, -23.105) -> (0, -23.105) projected
  line L3 (7, 2.895) -> (7, -23.105) projected
  line L4 (12.9, 2.895) -> (7, 2.895) projected
  line L5 (12.9, -23.105) -> (12.9, 2.895) projected
  line L6 (19.9, -23.105) -> (12.9, -23.105) projected
  line L7 (19.9, -9.1978) -> (19.9, -23.105) projected
  arc A3 (28.6868, 12.0154) -> (19.9, -9.1978) centre (49.9, -9.1978) ccw projected
  line L8 (41.0319, 24.3606) -> (28.6868, 12.0154) projected
  line L9 (38.2035, 27.189) -> (41.0319, 24.3606) projected
  line L10 (18.1725, 7.158) -> (38.2035, 27.189) projected
  arc A4 (14.6735, 6.4145) -> (18.1725, 7.158) centre (14.5185, 15.7485) ccw projected
  arc A5 (16.459, 6.6171) -> (12.9, 2.895) centre (17.4091, 2.1461) ccw
  point P0 (-77.7004, 2.895)
extrude "Extrusion38" cut sketch "Sketch44" against normal blind 10 contours A0 A5 L4 L3 L2 L1 A2 L0 A1
properties part number "MPM_connector_holder_part_2"
